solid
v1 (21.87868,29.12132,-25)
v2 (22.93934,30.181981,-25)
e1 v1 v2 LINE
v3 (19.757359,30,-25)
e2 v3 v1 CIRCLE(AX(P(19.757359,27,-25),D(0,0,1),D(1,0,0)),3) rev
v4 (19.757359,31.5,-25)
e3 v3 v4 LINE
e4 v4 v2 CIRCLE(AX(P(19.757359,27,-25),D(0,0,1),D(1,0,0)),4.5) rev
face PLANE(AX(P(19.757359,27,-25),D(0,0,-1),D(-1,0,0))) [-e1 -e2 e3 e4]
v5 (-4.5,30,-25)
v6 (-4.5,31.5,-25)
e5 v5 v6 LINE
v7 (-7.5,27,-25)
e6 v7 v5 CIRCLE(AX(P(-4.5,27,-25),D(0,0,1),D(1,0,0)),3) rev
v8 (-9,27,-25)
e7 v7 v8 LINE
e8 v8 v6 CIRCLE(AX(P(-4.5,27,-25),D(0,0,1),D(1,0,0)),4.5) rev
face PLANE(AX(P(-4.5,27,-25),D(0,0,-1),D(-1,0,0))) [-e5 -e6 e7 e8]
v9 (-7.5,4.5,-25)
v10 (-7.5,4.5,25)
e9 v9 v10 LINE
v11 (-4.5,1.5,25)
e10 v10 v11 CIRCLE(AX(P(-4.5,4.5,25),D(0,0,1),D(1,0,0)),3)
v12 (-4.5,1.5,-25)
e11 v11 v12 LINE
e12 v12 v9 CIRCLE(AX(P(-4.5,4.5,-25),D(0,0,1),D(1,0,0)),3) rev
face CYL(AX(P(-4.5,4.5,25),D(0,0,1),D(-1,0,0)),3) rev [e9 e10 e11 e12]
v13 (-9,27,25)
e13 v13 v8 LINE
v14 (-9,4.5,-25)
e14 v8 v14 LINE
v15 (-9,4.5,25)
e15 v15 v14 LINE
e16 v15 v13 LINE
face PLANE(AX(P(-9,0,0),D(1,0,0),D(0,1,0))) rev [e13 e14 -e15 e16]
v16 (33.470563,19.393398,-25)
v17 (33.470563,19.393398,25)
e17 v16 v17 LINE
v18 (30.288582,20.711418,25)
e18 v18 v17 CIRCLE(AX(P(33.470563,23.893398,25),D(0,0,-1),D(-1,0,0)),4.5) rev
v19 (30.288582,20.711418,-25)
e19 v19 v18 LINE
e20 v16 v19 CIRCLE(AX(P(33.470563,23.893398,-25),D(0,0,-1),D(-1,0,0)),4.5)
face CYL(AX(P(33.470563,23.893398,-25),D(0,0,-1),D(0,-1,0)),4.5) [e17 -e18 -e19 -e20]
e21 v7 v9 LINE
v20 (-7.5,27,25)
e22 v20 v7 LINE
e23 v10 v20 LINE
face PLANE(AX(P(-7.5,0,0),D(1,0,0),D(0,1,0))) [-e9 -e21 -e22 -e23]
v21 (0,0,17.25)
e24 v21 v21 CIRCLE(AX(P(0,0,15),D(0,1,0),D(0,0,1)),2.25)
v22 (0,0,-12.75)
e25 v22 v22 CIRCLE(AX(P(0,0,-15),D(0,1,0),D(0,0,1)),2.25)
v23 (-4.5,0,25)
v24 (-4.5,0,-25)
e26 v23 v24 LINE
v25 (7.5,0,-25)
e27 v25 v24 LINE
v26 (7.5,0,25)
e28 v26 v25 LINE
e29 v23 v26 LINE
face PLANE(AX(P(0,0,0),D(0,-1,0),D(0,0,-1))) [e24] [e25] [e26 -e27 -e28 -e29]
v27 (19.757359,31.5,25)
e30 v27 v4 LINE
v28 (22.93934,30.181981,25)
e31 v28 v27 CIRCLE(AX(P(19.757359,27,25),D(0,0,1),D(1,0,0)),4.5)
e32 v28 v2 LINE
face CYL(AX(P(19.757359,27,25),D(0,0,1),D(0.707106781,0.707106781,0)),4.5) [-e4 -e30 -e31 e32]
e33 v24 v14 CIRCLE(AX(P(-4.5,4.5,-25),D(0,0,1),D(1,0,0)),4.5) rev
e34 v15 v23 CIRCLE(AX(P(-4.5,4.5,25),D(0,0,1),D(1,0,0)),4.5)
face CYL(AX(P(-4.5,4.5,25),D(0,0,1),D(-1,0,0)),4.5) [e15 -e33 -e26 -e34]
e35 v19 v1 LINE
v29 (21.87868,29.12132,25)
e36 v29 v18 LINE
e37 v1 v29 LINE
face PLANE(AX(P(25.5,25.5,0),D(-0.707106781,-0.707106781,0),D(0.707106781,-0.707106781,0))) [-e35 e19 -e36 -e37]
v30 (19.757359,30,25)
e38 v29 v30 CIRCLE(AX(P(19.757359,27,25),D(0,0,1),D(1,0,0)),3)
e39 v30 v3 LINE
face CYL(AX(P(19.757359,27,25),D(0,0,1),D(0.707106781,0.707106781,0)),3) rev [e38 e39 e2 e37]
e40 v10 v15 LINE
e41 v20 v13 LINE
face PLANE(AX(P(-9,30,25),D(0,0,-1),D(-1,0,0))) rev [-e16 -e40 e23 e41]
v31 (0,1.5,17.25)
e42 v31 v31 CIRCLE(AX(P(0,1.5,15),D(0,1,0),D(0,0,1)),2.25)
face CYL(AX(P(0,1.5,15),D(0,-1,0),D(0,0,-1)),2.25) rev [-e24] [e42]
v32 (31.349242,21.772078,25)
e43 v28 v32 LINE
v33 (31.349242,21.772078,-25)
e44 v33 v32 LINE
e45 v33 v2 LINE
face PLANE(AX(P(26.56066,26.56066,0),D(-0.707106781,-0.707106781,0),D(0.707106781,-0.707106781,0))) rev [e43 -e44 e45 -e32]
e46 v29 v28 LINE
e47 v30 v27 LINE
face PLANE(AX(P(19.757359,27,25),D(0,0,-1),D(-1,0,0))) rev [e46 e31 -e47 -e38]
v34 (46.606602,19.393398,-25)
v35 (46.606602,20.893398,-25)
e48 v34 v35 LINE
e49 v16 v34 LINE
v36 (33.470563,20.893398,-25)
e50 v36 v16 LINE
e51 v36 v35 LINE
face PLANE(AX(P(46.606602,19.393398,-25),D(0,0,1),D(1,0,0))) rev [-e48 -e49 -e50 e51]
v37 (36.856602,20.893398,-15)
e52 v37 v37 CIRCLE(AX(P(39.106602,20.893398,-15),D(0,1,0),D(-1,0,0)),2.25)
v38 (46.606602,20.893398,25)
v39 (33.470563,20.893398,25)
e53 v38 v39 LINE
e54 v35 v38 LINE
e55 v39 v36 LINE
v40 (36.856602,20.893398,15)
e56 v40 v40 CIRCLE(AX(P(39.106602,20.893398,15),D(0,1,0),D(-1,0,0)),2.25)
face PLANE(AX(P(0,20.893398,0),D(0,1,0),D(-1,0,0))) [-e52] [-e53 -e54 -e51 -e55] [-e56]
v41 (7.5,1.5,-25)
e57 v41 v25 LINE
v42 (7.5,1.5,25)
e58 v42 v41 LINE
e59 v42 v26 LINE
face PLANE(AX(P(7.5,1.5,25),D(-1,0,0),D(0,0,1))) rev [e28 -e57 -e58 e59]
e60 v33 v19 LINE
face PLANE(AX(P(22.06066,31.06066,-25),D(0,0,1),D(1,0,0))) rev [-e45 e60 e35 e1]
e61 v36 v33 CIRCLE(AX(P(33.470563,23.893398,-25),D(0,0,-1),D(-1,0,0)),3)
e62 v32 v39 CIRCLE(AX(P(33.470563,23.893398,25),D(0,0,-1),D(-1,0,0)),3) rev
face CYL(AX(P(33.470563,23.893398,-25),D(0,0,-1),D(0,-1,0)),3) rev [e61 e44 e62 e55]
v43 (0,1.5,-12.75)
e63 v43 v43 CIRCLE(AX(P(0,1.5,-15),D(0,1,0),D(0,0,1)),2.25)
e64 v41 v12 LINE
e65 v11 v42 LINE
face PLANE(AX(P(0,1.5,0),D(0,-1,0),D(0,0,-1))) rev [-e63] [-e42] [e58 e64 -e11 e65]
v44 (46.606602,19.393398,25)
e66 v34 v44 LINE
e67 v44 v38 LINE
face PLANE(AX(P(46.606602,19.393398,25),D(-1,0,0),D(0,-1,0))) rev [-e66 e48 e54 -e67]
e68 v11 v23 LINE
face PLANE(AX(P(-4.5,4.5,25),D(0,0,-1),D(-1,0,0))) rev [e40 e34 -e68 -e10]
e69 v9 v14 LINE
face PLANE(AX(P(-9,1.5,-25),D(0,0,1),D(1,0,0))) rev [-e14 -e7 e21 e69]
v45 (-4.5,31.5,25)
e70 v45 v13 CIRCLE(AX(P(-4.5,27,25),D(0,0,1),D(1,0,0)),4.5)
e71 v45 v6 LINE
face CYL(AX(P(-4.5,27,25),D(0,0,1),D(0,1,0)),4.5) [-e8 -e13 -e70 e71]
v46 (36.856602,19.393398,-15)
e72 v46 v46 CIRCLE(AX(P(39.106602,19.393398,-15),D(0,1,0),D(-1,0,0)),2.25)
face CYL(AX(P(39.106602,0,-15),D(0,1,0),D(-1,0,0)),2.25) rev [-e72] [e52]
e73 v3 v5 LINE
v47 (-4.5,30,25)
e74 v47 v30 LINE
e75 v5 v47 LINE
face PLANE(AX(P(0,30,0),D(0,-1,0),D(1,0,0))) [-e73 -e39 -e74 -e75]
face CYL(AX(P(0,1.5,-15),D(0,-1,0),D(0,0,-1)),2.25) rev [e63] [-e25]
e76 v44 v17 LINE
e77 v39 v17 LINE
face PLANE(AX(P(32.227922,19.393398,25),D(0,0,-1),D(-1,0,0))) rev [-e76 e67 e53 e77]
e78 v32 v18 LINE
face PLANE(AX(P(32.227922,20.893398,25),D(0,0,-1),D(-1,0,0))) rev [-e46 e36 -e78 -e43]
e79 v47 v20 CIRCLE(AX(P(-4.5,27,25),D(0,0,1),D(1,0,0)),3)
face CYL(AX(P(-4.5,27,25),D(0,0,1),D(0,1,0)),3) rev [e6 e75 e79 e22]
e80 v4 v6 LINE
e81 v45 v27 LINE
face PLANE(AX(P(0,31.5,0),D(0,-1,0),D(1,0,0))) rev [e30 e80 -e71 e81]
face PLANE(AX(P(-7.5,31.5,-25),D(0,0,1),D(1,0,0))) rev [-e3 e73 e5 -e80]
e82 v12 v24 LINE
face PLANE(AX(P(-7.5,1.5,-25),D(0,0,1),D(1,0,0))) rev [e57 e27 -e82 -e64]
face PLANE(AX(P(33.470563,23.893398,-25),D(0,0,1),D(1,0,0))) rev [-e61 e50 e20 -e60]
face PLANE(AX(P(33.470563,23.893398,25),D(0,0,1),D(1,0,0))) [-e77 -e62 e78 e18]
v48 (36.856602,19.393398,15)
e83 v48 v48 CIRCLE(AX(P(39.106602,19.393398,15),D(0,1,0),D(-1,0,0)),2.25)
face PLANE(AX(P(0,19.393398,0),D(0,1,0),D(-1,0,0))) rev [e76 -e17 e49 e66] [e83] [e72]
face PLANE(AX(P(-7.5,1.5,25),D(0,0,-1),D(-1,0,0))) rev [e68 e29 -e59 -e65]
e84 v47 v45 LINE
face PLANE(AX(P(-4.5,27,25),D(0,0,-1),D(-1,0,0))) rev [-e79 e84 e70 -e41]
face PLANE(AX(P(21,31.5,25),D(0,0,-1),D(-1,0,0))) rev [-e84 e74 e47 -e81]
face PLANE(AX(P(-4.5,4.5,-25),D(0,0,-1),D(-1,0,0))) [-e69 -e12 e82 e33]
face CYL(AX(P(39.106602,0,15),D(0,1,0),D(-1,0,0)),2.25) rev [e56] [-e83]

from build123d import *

# Parameters (mm, degrees)
SKETCH1_W                    = 15
SKETCH1_H                    = 50
SKETCH1_R                    = 2.25
BASE_FLANGE1_DEPTH           = 1.5
EDGE_FLANGE1_STRIP_W         = 12
EDGE_FLANGE1_STRIP_H         = 1.5
EDGE_FLANGE1_STRIP_CUT_DEPTH = 50
EDGE_FLANGE1_DEPTH           = 50
EDGE_FLANGE2_STRIP_W         = 12
EDGE_FLANGE2_STRIP_H         = 1.5
EDGE_FLANGE2_STRIP_CUT_DEPTH = 50
EDGE_FLANGE2_DEPTH           = 50
EDGE_FLANGE3_STRIP_CUT_DEPTH = 50
EDGE_FLANGE3_DEPTH           = 50
EDGE_FLANGE4_STRIP_CUT_DEPTH = 50
EDGE_FLANGE4_DEPTH           = 50
SKETCH19_R                   = 2.25
CUT_EXTRUDE1_DEPTH           = 57.865713883


# Sheet-metal steps are written as plain solids
with BuildPart() as part:
    # Sketch1 → Base-Flange1 (new body)
    with BuildSketch(Plane(origin=(0, 0, 0), x_dir=(1, 0, 0), z_dir=(0, 1, 0))):
        Rectangle(SKETCH1_W, SKETCH1_H)
        with Locations(Location((0, 15, 0), (0, 0, 270))):
            Circle(SKETCH1_R, mode=Mode.SUBTRACT)
        with Locations(Location((0, -15, 0), (0, 0, 270))):
            Circle(SKETCH1_R, mode=Mode.SUBTRACT)
    extrude(amount=BASE_FLANGE1_DEPTH)

    # Edge-Flange1 strip (across the edge) → Edge-Flange1 strip cut (cut)
    with BuildSketch(Plane(origin=(-7.5, 1.5, -25), x_dir=(1, 0, 0), z_dir=(0, 0, 1))):
        with Locations((-3, -0.75)):
            Rectangle(EDGE_FLANGE1_STRIP_W, EDGE_FLANGE1_STRIP_H)
    extrude(amount=EDGE_FLANGE1_STRIP_CUT_DEPTH, mode=Mode.SUBTRACT)

    # Edge-Flange1 section (across the edge) → Edge-Flange1 (add)
    with BuildSketch(Plane(origin=(-7.5, 1.5, -25), x_dir=(1, 0, 0), z_dir=(0, 0, 1))):
        with BuildLine():
            Line((-1.5, 3), (-1.5, 28.5))
            Line((-1.5, 28.5), (0, 28.5))
            Line((0, 28.5), (0, 3))
            ThreePointArc((0, 3), (0.878679656, 0.878679656), (3, 0))
            Line((3, 0), (3, -1.5))
            ThreePointArc((3, -1.5), (-0.181980515, -0.181980515), (-1.5, 3))
        make_face()
    extrude(amount=EDGE_FLANGE1_DEPTH)

    # Edge-Flange2 strip (across the edge) → Edge-Flange2 strip cut (cut)
    with BuildSketch(Plane(origin=(-7.5, 30, -25), x_dir=(0, -1, 0), z_dir=(0, 0, 1))):
        with Locations((-3, -0.75)):
            Rectangle(EDGE_FLANGE2_STRIP_W, EDGE_FLANGE2_STRIP_H)
    extrude(amount=EDGE_FLANGE2_STRIP_CUT_DEPTH, mode=Mode.SUBTRACT)

    # Edge-Flange2 section (across the edge) → Edge-Flange2 (add)
    with BuildSketch(Plane(origin=(-7.5, 30, -25), x_dir=(0, -1, 0), z_dir=(0, 0, 1))):
        with BuildLine():
            Line((-1.5, 3), (-1.5, 28.5))
            Line((-1.5, 28.5), (0, 28.5))
            Line((0, 28.5), (0, 3))
            ThreePointArc((0, 3), (0.878679656, 0.878679656), (3, 0))
            Line((3, 0), (3, -1.5))
            ThreePointArc((3, -1.5), (-0.181980515, -0.181980515), (-1.5, 3))
        make_face()
    extrude(amount=EDGE_FLANGE2_DEPTH)

    # Edge-Flange3 strip (across the edge) → Edge-Flange3 strip cut (cut)
    with BuildSketch(Plane(origin=(21, 30, -25), x_dir=(-0.7071067811865389, -0.7071067811865561, 0), z_dir=(0, 0, 1))):
        Polygon((-8.66726189, 6.545941546), (-0.181980515, -1.939339828), (0.878679656, -0.878679656), (-7.606601718, 7.606601718), align=None)
    extrude(amount=EDGE_FLANGE3_STRIP_CUT_DEPTH, mode=Mode.SUBTRACT)

    # Edge-Flange3 section (across the edge) → Edge-Flange3 (add)
    with BuildSketch(Plane(origin=(21, 30, -25), x_dir=(-0.7071067811865389, -0.7071067811865561, 0), z_dir=(0, 0, 1))):
        with BuildLine():
            Line((-1.5, 1.242640687), (-1.5, 14.378679656))
            Line((-1.5, 14.378679656), (0, 14.378679656))
            Line((0, 14.378679656), (0, 1.242640687))
            ThreePointArc((0, 1.242640687), (0.228361402, 0.09459039), (0.878679656, -0.878679656))
            Line((0.878679656, -0.878679656), (-0.181980515, -1.939339828))
            ThreePointArc((-0.181980515, -1.939339828), (-1.157457896, -0.479434759), (-1.5, 1.242640687))
        make_face()
    extrude(amount=EDGE_FLANGE3_DEPTH)

    # Edge-Flange4 strip (across the edge) → Edge-Flange4 strip cut (cut)
    with BuildSketch(Plane(origin=(32.227922061, 20.893398282, 25), x_dir=(0, 1, 0), z_dir=(0, 0, -1))):
        Polygon((-8.66726189, 6.545941546), (-0.181980515, -1.939339828), (0.878679656, -0.878679656), (-7.606601718, 7.606601718), align=None)
    extrude(amount=EDGE_FLANGE4_STRIP_CUT_DEPTH, mode=Mode.SUBTRACT)

    # Edge-Flange4 section (across the edge) → Edge-Flange4 (add)
    with BuildSketch(Plane(origin=(32.227922061, 20.893398282, 25), x_dir=(0, 1, 0), z_dir=(0, 0, -1))):
        with BuildLine():
            Line((-1.5, 1.242640687), (-1.5, 14.378679656))
            Line((-1.5, 14.378679656), (0, 14.378679656))
            Line((0, 14.378679656), (0, 1.242640687))
            ThreePointArc((0, 1.242640687), (0.228361402, 0.09459039), (0.878679656, -0.878679656))
            Line((0.878679656, -0.878679656), (-0.181980515, -1.939339828))
            ThreePointArc((-0.181980515, -1.939339828), (-1.157457896, -0.479434759), (-1.5, 1.242640687))
        make_face()
    extrude(amount=EDGE_FLANGE4_DEPTH)

    # Sketch19 → Cut-Extrude1 (cut, through all)
    with BuildSketch(Plane(origin=(0, 20.893398282, 0), x_dir=(1, 0, 0), z_dir=(0, 1, 0))):
        with Locations(Location((39.106601718, 15, 0), (0, 0, 180))):
            Circle(SKETCH19_R)
        with Locations(Location((39.106601718, -15, 0), (0, 0, 180))):
            Circle(SKETCH19_R)
    extrude(amount=-CUT_EXTRUDE1_DEPTH, mode=Mode.SUBTRACT)


solid = part.part
